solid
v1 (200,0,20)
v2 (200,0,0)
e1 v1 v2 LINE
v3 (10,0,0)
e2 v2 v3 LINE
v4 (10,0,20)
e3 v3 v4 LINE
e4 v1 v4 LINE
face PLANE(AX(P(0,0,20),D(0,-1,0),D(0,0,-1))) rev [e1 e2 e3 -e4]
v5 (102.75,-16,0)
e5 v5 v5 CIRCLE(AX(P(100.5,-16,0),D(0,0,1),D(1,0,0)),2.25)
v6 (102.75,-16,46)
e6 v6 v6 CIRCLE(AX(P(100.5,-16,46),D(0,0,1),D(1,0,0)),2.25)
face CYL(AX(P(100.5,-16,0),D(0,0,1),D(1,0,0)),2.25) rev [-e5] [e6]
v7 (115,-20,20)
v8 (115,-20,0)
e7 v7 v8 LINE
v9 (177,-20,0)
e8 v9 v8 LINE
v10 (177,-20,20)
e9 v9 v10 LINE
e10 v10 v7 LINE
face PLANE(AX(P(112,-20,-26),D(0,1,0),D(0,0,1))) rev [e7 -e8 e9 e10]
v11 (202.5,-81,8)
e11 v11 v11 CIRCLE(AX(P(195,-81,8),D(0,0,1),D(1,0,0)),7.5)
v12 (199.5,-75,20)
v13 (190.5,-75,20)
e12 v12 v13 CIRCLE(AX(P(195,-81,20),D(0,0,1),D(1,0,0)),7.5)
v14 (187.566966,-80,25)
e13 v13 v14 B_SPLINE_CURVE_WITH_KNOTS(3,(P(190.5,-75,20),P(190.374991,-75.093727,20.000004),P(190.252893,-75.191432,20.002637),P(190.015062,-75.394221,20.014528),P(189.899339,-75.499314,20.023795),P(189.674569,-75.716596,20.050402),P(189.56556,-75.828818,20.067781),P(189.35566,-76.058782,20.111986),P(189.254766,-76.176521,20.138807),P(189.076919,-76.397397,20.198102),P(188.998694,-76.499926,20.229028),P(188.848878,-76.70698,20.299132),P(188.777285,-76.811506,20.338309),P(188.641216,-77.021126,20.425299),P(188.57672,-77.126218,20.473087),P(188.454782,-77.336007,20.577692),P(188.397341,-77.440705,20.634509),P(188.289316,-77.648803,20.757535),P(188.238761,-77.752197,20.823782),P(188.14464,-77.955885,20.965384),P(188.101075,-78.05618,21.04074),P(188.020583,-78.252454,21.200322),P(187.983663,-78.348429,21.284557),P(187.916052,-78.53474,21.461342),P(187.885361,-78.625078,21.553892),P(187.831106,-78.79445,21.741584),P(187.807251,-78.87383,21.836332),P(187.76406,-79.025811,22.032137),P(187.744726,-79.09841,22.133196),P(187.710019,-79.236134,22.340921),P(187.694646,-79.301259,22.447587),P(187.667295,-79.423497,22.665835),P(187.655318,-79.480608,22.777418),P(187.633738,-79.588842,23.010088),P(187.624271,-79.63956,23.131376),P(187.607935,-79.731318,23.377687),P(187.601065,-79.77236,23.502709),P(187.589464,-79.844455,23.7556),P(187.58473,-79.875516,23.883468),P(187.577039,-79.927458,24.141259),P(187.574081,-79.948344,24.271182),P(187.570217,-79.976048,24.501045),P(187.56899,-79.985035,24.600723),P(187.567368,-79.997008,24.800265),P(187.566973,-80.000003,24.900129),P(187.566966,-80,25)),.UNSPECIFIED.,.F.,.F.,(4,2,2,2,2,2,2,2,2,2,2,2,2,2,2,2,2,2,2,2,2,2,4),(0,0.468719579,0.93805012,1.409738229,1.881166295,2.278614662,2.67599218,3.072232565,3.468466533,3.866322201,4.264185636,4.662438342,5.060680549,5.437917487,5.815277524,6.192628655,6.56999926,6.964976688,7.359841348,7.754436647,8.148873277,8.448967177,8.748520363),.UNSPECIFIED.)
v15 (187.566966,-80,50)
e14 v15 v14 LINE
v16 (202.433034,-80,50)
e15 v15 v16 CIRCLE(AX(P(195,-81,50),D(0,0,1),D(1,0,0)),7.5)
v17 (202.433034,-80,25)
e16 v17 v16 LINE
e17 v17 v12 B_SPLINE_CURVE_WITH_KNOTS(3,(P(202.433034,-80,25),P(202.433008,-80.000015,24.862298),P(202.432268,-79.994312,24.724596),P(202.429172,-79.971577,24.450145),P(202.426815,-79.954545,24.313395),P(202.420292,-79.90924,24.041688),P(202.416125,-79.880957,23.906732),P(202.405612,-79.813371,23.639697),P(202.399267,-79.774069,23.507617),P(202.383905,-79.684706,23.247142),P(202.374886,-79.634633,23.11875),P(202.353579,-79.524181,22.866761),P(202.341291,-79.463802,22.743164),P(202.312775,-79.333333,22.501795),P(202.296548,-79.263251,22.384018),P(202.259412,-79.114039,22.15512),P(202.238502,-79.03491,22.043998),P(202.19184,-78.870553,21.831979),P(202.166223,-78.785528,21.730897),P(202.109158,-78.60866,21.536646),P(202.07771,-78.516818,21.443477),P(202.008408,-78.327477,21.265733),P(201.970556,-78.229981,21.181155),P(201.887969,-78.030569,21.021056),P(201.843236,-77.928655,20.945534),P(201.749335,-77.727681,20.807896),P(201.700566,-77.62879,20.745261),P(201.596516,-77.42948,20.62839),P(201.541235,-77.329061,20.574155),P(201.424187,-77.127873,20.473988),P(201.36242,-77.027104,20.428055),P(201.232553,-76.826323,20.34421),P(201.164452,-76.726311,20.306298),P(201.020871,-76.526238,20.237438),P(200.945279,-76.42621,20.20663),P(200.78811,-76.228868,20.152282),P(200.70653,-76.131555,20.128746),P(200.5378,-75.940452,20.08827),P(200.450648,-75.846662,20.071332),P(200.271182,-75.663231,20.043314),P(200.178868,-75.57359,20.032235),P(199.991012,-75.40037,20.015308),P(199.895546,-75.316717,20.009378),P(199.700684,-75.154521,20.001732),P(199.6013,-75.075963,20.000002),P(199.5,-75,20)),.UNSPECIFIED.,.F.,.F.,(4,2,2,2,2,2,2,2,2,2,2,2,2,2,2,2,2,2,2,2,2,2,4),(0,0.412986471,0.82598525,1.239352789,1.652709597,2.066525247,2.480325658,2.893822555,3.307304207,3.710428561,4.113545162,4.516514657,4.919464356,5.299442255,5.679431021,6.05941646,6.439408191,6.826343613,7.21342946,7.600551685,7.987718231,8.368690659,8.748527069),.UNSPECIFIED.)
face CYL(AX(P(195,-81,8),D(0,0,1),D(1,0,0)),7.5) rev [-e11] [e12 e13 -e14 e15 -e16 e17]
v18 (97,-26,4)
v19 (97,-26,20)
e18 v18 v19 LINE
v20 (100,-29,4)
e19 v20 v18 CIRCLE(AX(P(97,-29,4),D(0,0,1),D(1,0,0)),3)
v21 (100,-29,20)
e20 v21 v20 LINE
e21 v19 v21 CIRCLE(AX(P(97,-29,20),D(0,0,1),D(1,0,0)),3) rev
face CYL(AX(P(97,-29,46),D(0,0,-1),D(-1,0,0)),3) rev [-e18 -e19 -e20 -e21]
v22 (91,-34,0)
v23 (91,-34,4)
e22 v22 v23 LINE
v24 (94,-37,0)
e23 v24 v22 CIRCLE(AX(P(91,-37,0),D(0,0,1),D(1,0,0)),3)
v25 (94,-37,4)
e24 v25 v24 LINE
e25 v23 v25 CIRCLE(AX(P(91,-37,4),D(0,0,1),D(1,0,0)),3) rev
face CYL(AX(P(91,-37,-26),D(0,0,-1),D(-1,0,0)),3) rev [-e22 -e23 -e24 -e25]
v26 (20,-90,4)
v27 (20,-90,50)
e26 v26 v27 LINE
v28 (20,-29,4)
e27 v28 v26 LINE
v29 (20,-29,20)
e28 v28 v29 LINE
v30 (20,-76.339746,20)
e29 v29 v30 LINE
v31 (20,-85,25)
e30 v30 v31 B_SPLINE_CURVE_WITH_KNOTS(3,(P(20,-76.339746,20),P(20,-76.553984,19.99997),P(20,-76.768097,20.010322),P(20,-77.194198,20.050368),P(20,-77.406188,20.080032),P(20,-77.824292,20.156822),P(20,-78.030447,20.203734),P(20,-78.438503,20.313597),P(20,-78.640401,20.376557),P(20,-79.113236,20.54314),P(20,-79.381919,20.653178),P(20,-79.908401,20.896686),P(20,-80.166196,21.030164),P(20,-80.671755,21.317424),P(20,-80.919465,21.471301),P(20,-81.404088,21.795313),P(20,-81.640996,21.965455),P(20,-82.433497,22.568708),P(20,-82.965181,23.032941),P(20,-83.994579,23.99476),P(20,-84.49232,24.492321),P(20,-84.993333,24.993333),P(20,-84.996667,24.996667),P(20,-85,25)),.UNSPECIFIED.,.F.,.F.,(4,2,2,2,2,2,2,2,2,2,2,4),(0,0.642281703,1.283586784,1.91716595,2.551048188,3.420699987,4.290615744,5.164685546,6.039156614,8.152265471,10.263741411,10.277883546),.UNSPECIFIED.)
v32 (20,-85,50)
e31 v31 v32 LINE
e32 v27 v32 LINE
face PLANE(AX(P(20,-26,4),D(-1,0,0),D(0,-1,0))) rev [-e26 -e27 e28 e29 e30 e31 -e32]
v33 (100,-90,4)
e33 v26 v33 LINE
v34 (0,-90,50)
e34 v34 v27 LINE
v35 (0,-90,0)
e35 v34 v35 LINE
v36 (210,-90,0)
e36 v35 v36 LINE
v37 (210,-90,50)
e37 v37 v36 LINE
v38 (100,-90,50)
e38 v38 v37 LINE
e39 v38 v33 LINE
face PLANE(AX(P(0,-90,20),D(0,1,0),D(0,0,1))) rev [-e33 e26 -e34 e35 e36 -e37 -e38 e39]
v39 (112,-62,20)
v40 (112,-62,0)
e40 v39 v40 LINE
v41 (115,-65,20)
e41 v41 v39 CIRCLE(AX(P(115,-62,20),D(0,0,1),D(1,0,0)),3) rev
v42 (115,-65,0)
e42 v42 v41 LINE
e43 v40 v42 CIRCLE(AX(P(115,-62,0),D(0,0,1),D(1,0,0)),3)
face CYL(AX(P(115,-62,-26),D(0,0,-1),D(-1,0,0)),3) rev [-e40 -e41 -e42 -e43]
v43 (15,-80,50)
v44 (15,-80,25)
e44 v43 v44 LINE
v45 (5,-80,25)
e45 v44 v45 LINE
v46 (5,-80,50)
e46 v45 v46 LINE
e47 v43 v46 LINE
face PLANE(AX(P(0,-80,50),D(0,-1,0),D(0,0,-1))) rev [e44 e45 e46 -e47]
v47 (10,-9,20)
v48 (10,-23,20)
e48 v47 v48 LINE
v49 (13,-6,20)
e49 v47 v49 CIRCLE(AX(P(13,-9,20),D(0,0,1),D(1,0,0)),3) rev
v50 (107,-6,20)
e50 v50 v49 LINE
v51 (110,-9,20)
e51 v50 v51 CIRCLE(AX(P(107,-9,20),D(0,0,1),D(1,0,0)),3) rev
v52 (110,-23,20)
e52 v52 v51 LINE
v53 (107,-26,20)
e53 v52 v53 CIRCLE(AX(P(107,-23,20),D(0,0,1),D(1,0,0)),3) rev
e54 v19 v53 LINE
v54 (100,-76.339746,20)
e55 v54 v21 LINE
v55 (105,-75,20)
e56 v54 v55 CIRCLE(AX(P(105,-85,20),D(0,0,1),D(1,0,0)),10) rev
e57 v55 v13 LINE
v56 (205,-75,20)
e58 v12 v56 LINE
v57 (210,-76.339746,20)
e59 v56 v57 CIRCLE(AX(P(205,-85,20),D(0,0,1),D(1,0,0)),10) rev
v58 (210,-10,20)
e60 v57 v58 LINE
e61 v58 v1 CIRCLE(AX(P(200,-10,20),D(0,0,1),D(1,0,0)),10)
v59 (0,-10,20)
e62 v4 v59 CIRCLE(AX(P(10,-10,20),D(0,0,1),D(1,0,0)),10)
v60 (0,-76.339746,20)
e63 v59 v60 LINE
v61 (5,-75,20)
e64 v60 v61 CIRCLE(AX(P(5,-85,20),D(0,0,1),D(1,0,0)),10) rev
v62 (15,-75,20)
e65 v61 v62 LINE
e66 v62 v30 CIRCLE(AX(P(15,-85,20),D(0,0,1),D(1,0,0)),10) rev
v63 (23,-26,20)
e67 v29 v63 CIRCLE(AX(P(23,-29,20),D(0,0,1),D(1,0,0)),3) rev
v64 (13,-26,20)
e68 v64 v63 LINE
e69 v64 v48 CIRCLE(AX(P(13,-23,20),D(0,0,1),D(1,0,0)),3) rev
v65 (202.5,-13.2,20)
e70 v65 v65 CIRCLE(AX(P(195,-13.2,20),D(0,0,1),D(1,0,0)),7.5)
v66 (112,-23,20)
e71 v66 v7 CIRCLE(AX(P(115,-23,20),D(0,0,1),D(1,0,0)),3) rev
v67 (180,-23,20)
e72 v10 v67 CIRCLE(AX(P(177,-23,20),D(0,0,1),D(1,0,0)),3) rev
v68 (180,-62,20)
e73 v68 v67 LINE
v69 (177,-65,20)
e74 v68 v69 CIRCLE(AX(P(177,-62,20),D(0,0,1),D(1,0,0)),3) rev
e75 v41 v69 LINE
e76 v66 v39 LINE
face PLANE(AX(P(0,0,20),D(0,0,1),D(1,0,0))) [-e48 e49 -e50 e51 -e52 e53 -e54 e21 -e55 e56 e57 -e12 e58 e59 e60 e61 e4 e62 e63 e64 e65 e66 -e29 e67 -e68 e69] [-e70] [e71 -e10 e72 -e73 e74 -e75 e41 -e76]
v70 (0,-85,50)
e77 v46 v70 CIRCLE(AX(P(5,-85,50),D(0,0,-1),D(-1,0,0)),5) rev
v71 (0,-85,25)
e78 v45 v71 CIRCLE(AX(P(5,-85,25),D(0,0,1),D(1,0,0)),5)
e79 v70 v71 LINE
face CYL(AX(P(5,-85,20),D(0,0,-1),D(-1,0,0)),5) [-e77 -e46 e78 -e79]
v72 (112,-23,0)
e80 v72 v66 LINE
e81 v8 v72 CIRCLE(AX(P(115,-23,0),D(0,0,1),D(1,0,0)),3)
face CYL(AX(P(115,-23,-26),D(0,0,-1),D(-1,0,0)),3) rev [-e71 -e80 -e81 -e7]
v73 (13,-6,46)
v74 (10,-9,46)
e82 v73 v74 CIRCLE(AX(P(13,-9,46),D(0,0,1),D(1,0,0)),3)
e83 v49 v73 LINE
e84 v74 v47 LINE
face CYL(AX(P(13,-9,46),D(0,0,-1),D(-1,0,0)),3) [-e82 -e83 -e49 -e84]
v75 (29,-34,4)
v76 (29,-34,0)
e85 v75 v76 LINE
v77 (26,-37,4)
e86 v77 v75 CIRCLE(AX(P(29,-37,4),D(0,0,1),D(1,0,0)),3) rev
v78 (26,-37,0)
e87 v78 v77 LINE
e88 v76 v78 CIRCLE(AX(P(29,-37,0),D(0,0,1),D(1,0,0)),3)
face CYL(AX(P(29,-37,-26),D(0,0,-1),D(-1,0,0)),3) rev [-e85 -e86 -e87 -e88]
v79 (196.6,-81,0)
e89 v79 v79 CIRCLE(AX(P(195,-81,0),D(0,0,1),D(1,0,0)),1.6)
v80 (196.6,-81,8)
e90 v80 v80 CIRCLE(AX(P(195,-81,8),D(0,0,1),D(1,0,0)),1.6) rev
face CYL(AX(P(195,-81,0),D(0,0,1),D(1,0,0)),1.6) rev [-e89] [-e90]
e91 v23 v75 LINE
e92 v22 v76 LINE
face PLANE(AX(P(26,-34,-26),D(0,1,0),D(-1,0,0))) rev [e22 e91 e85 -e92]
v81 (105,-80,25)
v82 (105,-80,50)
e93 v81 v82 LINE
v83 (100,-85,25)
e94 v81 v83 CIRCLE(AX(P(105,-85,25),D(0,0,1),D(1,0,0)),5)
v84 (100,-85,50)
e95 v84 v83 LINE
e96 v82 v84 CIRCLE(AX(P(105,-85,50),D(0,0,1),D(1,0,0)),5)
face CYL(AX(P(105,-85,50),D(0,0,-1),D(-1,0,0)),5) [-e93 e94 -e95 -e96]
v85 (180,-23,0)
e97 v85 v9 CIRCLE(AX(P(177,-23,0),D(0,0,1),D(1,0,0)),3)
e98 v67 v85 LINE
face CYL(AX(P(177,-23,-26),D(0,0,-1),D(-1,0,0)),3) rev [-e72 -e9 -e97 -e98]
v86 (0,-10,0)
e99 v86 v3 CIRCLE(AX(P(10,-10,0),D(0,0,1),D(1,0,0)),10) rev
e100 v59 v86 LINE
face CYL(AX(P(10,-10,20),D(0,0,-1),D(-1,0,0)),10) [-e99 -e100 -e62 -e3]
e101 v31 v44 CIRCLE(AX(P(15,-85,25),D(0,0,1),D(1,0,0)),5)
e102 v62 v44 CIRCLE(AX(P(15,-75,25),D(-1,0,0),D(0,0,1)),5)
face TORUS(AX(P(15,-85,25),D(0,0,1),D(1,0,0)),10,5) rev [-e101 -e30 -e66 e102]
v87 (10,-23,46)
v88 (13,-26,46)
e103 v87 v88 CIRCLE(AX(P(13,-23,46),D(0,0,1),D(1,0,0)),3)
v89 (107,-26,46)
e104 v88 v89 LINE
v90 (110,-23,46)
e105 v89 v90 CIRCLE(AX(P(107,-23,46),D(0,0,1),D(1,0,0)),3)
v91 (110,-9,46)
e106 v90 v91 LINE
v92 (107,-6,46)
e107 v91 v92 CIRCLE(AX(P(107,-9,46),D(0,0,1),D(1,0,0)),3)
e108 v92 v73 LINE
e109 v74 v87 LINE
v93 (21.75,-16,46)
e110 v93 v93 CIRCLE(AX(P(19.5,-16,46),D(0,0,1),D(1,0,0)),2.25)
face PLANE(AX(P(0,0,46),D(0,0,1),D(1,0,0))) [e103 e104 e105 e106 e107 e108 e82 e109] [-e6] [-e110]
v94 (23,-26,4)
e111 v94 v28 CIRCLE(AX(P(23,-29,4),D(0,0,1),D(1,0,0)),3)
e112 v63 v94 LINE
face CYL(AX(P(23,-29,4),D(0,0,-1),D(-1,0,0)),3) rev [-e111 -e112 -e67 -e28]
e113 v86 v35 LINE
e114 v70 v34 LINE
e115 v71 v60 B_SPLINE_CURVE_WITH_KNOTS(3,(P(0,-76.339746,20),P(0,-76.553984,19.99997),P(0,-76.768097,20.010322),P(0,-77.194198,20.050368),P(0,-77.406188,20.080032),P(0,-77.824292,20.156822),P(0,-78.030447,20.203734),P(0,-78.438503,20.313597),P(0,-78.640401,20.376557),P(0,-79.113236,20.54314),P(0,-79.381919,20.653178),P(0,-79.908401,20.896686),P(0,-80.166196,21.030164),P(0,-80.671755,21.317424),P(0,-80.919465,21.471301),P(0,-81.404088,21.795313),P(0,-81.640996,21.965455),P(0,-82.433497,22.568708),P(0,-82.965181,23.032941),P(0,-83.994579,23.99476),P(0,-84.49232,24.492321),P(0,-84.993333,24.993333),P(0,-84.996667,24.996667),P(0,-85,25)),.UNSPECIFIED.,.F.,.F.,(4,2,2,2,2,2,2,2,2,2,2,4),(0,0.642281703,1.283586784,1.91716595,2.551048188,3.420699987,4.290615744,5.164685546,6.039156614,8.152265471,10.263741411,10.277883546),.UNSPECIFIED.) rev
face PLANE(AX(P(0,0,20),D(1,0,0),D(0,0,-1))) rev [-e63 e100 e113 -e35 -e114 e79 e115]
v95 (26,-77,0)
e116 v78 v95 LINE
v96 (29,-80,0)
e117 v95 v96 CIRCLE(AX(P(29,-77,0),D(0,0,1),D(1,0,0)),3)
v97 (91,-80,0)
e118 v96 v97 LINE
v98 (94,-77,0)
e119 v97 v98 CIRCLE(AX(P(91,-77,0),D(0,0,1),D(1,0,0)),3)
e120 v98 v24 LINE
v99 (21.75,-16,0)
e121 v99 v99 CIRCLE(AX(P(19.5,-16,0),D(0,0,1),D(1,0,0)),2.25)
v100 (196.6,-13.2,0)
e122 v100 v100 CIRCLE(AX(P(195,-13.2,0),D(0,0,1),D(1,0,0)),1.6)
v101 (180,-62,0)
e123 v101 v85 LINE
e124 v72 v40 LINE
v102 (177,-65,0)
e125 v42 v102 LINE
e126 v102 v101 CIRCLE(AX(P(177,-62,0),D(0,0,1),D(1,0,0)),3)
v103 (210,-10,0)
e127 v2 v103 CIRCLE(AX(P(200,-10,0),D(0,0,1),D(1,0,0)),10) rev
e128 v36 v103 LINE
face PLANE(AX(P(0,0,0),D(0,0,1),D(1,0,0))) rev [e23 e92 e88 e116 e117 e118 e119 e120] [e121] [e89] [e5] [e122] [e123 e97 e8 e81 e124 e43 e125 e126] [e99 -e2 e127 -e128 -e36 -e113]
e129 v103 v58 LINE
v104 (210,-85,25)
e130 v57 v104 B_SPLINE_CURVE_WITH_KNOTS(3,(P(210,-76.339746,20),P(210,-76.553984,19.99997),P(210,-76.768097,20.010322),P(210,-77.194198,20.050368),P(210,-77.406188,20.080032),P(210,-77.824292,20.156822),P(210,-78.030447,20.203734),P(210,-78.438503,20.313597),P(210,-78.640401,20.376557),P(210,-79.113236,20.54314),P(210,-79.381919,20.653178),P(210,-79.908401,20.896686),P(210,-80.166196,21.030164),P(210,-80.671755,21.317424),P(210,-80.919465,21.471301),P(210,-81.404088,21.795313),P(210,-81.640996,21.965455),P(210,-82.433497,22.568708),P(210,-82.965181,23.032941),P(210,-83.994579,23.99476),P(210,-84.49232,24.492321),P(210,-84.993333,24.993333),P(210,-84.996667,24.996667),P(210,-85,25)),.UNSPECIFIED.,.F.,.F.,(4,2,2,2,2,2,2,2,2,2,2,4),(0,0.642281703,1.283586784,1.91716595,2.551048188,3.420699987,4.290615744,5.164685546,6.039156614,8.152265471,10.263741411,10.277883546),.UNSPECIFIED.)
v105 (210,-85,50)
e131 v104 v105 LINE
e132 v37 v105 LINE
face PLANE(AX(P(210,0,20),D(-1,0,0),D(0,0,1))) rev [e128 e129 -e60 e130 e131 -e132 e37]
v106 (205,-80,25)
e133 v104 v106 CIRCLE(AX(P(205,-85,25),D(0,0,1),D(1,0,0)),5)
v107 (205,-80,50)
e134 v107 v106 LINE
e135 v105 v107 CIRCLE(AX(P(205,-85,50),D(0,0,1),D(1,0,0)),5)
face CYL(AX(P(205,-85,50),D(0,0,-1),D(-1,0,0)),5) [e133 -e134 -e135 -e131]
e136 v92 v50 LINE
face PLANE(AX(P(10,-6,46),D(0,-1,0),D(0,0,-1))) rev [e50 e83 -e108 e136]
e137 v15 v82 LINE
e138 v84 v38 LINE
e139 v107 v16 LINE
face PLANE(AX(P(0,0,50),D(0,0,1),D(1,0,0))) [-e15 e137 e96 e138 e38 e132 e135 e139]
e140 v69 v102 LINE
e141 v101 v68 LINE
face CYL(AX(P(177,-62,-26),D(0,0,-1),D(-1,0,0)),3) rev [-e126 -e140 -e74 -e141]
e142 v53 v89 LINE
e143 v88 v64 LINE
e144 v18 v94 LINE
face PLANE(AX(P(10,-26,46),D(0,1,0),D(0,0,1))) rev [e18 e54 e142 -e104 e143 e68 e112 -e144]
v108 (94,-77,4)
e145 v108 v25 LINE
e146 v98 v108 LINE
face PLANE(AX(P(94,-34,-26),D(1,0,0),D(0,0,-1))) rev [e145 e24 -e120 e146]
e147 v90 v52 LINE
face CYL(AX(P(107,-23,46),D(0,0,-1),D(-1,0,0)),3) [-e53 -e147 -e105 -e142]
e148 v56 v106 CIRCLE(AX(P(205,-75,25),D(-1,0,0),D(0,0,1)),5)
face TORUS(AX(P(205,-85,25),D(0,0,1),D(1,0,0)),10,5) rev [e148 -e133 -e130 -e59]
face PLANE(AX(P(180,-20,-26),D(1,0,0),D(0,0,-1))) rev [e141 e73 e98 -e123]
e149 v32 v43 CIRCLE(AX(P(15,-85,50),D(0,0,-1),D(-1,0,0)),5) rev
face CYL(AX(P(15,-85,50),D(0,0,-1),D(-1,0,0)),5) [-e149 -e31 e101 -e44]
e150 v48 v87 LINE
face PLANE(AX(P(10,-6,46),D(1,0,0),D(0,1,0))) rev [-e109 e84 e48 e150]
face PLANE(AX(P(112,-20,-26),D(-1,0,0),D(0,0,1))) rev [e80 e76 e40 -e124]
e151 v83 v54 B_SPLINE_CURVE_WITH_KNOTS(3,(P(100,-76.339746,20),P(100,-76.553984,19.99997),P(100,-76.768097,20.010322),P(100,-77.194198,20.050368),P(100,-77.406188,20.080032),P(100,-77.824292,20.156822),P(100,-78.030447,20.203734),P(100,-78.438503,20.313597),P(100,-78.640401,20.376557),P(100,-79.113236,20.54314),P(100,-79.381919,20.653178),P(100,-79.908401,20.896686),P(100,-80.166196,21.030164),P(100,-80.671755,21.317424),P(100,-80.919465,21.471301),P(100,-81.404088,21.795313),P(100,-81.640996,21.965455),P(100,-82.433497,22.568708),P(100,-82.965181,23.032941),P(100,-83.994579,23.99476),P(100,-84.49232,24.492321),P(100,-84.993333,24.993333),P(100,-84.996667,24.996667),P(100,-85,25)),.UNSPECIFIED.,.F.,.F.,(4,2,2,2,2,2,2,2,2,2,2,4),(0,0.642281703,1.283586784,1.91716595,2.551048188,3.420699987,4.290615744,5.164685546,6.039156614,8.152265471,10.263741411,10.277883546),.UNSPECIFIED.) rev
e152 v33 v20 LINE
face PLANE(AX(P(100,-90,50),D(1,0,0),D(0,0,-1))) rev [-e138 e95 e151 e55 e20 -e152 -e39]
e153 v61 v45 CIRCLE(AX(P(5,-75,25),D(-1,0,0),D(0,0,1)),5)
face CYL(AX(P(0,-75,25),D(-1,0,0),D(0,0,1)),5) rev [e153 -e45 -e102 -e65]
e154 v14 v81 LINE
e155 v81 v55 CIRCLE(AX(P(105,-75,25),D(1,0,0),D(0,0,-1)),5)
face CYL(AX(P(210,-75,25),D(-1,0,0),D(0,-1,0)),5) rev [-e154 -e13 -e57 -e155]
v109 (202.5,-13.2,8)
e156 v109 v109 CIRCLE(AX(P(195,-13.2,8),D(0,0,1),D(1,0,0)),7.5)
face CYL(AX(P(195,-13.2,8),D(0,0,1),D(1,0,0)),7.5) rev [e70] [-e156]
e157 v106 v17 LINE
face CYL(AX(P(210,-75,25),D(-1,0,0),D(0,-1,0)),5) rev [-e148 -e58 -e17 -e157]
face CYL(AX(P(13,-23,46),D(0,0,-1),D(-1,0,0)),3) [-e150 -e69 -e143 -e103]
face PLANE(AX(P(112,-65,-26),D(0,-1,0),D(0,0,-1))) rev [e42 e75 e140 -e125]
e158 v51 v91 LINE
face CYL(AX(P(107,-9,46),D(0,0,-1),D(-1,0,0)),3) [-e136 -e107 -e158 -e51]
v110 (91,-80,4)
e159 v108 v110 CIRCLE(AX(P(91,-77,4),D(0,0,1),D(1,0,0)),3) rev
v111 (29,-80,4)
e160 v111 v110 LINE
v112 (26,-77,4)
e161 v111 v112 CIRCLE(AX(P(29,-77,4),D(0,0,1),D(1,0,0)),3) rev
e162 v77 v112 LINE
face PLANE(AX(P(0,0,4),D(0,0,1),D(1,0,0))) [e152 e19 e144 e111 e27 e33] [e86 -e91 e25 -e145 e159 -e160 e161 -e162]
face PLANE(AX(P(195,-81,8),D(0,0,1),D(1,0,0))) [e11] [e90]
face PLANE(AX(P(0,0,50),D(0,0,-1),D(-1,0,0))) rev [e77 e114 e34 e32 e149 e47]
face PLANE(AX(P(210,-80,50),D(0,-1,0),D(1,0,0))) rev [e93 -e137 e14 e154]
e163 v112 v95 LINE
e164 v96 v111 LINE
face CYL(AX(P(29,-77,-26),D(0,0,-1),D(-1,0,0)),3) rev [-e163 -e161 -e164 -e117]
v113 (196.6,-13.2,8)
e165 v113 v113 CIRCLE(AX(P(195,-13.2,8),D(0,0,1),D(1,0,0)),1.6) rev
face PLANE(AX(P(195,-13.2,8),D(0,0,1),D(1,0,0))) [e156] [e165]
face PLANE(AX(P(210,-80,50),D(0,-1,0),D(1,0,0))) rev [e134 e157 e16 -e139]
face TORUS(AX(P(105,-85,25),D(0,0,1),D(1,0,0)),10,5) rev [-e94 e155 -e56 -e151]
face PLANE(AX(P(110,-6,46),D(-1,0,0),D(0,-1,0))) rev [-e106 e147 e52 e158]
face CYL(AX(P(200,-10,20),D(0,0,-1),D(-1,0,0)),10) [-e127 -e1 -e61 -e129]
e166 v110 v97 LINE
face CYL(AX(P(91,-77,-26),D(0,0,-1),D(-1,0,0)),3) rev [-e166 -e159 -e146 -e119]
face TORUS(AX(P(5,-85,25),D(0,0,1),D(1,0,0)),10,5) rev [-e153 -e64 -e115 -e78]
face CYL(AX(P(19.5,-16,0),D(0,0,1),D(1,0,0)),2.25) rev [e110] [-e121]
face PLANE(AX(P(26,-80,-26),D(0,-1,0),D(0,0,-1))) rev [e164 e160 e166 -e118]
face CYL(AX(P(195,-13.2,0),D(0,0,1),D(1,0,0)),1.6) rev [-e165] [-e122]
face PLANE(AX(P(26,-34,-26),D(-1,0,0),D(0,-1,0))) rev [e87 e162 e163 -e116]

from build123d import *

# Parameters (mm, degrees)
SKETCH1_W           = 210
SKETCH1_H           = 90
BOSS_EXTRUDE1_DEPTH = 20
SKETCH2_R           = 1.6
CUT_EXTRUDE1_DEPTH  = 20
SKETCH3_W           = 110
SKETCH3_H           = 10
BOSS_EXTRUDE2_DEPTH = 30
SKETCH4_W           = 100
SKETCH4_H           = 20
BOSS_EXTRUDE3_DEPTH = 26
SKETCH5_R           = 2.25
CUT_EXTRUDE2_DEPTH  = 234.057932712
SKETCH7_W           = 80
SKETCH7_H           = 64
CUT_EXTRUDE3_DEPTH  = 16
SKETCH8_R           = 7.5
CUT_EXTRUDE4_DEPTH  = 12
SKETCH9_R           = 7.5
CUT_EXTRUDE5_DEPTH  = 42
SKETCH10_W          = 68
SKETCH10_H          = 45
CUT_EXTRUDE6_DEPTH  = 46
SKETCH11_W          = 20
SKETCH11_H          = 10
BOSS_EXTRUDE5_DEPTH = 30
FILLET1_R           = 10
SKETCH12_W          = 68
SKETCH12_H          = 46
CUT_EXTRUDE7_DEPTH  = 30
FILLET2_R           = 5
FILLET3_R           = 5
FILLET4_R           = 3
FILLET5_R           = 3


with BuildPart() as part:
    # Sketch1 → Boss-Extrude1 (new body)
    with BuildSketch(Plane.XY):
        with Locations((105, -45)):
            Rectangle(SKETCH1_W, SKETCH1_H)
    extrude(amount=BOSS_EXTRUDE1_DEPTH)

    # Sketch2 → Cut-Extrude1 (cut)
    with BuildSketch(Plane.XY.offset(20)):
        with Locations((195, -13.2)):
            Circle(SKETCH2_R)
        with Locations((195, -81)):
            Circle(SKETCH2_R)
    extrude(amount=-CUT_EXTRUDE1_DEPTH, mode=Mode.SUBTRACT)

    # Sketch3 → Boss-Extrude2 (add)
    with BuildSketch(Plane.XY.offset(20)):
        with Locations((155, -85)):
            Rectangle(SKETCH3_W, SKETCH3_H)
    extrude(amount=BOSS_EXTRUDE2_DEPTH)

    # Sketch4 → Boss-Extrude3 (add)
    with BuildSketch(Plane.XY.offset(20)):
        with Locations((60, -16)):
            Rectangle(SKETCH4_W, SKETCH4_H)
    extrude(amount=BOSS_EXTRUDE3_DEPTH)

    # Sketch5 → Cut-Extrude2 (cut, through all)
    with BuildSketch(Plane.XY.offset(46)):
        with Locations((100.5, -16)):
            Circle(SKETCH5_R)
        with Locations((19.5, -16)):
            Circle(SKETCH5_R)
    extrude(amount=-CUT_EXTRUDE2_DEPTH, mode=Mode.SUBTRACT)

    # Sketch7 → Cut-Extrude3 (cut)
    with BuildSketch(Plane.XY.offset(20)):
        with Locations((60, -58)):
            Rectangle(SKETCH7_W, SKETCH7_H)
    extrude(amount=-CUT_EXTRUDE3_DEPTH, mode=Mode.SUBTRACT)

    # Sketch8 → Cut-Extrude4 (cut)
    with BuildSketch(Plane.XY.offset(20)):
        with Locations((195, -13.2)):
            Circle(SKETCH8_R)
    extrude(amount=-CUT_EXTRUDE4_DEPTH, mode=Mode.SUBTRACT)

    # Sketch9 → Cut-Extrude5 (cut)
    with BuildSketch(Plane.XY.offset(50)):
        with Locations((195, -81)):
            Circle(SKETCH9_R)
    extrude(amount=-CUT_EXTRUDE5_DEPTH, mode=Mode.SUBTRACT)

    # Sketch10 → Cut-Extrude6 (cut)
    with BuildSketch(Plane.XY.offset(20)):
        with Locations((146, -42.5)):
            Rectangle(SKETCH10_W, SKETCH10_H)
    extrude(amount=-CUT_EXTRUDE6_DEPTH, mode=Mode.SUBTRACT)

    # Sketch11 → Boss-Extrude5 (add)
    with BuildSketch(Plane.XY.offset(20)):
        with Locations((10, -85)):
            Rectangle(SKETCH11_W, SKETCH11_H)
    extrude(amount=BOSS_EXTRUDE5_DEPTH)

    # Fillet1
    fillet1_edges = [part.edges().sort_by_distance(p)[0] for p in [
        (0, 0, 10),
        (210, 0, 10),
    ]]
    fillet(fillet1_edges, radius=FILLET1_R)

    # Sketch12 → Cut-Extrude7 (cut)
    with BuildSketch(Plane.XY.offset(4)):
        with Locations((60, -57)):
            Rectangle(SKETCH12_W, SKETCH12_H)
    extrude(amount=-CUT_EXTRUDE7_DEPTH, mode=Mode.SUBTRACT)

    # Fillet2
    fillet2_edges = [part.edges().sort_by_distance(p)[0] for p in [
        (0, -80, 35),
        (20, -80, 35),
        (210, -80, 35),
        (100, -80, 35),
    ]]
    fillet(fillet2_edges, radius=FILLET2_R)

    # Fillet3
    # the kernel refuses this fillet: 5 mm, written as the material it adds along each edge
    with BuildSketch(Plane(origin=(189.933034374, -80, 20), x_dir=(0, 1, 0), z_dir=(1, 0, 0))) as fillet3_piece_1_section:
        with BuildLine():
            CenterArc((FILLET3_R, FILLET3_R), FILLET3_R, 180, 90)
            Line((0, FILLET3_R), (0, 0))
            Line((0, 0), (FILLET3_R, 0))
        make_face()
    fillet3_piece_1 = extrude(amount=15.066965626, mode=Mode.PRIVATE)
    fillet3_piece_1 = fillet3_piece_1 - Plane(origin=(195, -81, 20.004383527), x_dir=(1, 0, 0), z_dir=(0, 0, 1)) * Cylinder(7.5, 51, mode=Mode.PRIVATE)
    add(fillet3_piece_1)
    with BuildSketch(Plane(origin=(15, -80, 20), x_dir=(0, 1, 0), z_dir=(-1, 0, 0))) as fillet3_piece_2:
        with BuildLine():
            CenterArc((FILLET3_R, -FILLET3_R), FILLET3_R, 90, 90)
            Line((0, -FILLET3_R), (0, 0))
            Line((0, 0), (FILLET3_R, 0))
        make_face()
    extrude(amount=10)
    with BuildSketch(Plane(origin=(205, -85, 20), x_dir=(-0.801744239297649, -0.5976672776328267, 0), z_dir=(-0.5976672776328267, 0.801744239297649, 0))) as fillet3_piece_3_section:
        with BuildLine():
            CenterArc((5 + FILLET3_R, FILLET3_R), FILLET3_R, 180, 90)
            Line((5, FILLET3_R), (5, 0))
            Line((5, 0), (5 + FILLET3_R, 0))
        make_face()
    fillet3_piece_3 = revolve(axis=Axis((205, -85, 20), (0, 0, 1)), revolution_arc=233.296989237, mode=Mode.PRIVATE)
    fillet3_piece_3 = split(fillet3_piece_3, bisect_by=Plane(origin=(208.749694825, -90, 21.558141558), z_dir=(0, 1, 0)), keep=Keep.TOP, mode=Mode.PRIVATE)
    fillet3_piece_3 = split(fillet3_piece_3, bisect_by=Plane(origin=(210, -81.250305307, 21.558141558), z_dir=(-1, 0, 0)), keep=Keep.TOP, mode=Mode.PRIVATE)
    add(fillet3_piece_3)
    with BuildSketch(Plane(origin=(105, -85, 20), x_dir=(0, 1, 0), z_dir=(1, 0, 0))) as fillet3_piece_4_section:
        with BuildLine():
            CenterArc((5 + FILLET3_R, FILLET3_R), FILLET3_R, 180, 90)
            Line((5, FILLET3_R), (5, 0))
            Line((5, 0), (5 + FILLET3_R, 0))
        make_face()
    fillet3_piece_4 = revolve(axis=Axis((105, -85, 20), (0, 0, 1)), revolution_arc=233.296989237, mode=Mode.PRIVATE)
    fillet3_piece_4 = split(fillet3_piece_4, bisect_by=Plane(origin=(103.049091377, -90, 20.836500951), z_dir=(0, 1, 0)), keep=Keep.TOP, mode=Mode.PRIVATE)
    fillet3_piece_4 = split(fillet3_piece_4, bisect_by=Plane(origin=(100, -78.901123736, 20.836500951), z_dir=(1, 0, 0)), keep=Keep.TOP, mode=Mode.PRIVATE)
    add(fillet3_piece_4)
    with BuildSketch(Plane(origin=(15, -85, 20), x_dir=(0, 1, 0), z_dir=(-1, 0, 0))) as fillet3_piece_5_section:
        with BuildLine():
            CenterArc((5 + FILLET3_R, -FILLET3_R), FILLET3_R, 90, 90)
            Line((5, -FILLET3_R), (5, 0))
            Line((5, 0), (5 + FILLET3_R, 0))
        make_face()
    fillet3_piece_5 = revolve(axis=Axis((15, -85, 20), (0, 0, -1)), revolution_arc=233.296989237, mode=Mode.PRIVATE)
    fillet3_piece_5 = split(fillet3_piece_5, bisect_by=Plane(origin=(16.950908623, -90, 20.836500951), z_dir=(0, 1, 0)), keep=Keep.TOP, mode=Mode.PRIVATE)
    fillet3_piece_5 = split(fillet3_piece_5, bisect_by=Plane(origin=(20, -78.901123736, 20.836500951), z_dir=(-1, 0, 0)), keep=Keep.TOP, mode=Mode.PRIVATE)
    add(fillet3_piece_5)
    with BuildSketch(Plane(origin=(5, -85, 20), x_dir=(0.8017442392976476, -0.5976672776328283, 0), z_dir=(0.5976672776328283, 0.8017442392976476, 0))) as fillet3_piece_6_section:
        with BuildLine():
            CenterArc((5 + FILLET3_R, -FILLET3_R), FILLET3_R, 90, 90)
            Line((5, -FILLET3_R), (5, 0))
            Line((5, 0), (5 + FILLET3_R, 0))
        make_face()
    fillet3_piece_6 = revolve(axis=Axis((5, -85, 20), (0, 0, -1)), revolution_arc=233.296989237, mode=Mode.PRIVATE)
    fillet3_piece_6 = split(fillet3_piece_6, bisect_by=Plane(origin=(1.250305308, -90, 21.55814164), z_dir=(0, 1, 0)), keep=Keep.TOP, mode=Mode.PRIVATE)
    fillet3_piece_6 = split(fillet3_piece_6, bisect_by=Plane(origin=(0, -81.250305308, 21.55814164), z_dir=(1, 0, 0)), keep=Keep.TOP, mode=Mode.PRIVATE)
    add(fillet3_piece_6)
    with BuildSketch(Plane(origin=(105, -80, 20), x_dir=(0, 1, 0), z_dir=(1, 0, 0))) as fillet3_piece_7_section:
        with BuildLine():
            CenterArc((FILLET3_R, FILLET3_R), FILLET3_R, 180, 90)
            Line((0, FILLET3_R), (0, 0))
            Line((0, 0), (FILLET3_R, 0))
        make_face()
    fillet3_piece_7 = extrude(amount=95.066965626, mode=Mode.PRIVATE)
    fillet3_piece_7 = fillet3_piece_7 - Plane(origin=(195, -81, 21.114667371), x_dir=(1, 0, 0), z_dir=(0, 0, 1)) * Cylinder(7.5, 211, mode=Mode.PRIVATE)
    add(fillet3_piece_7)

    # Fillet4
    fillet4_edges = [part.edges().sort_by_distance(p)[0] for p in [
        (180, -20, 10),
        (180, -65, 10),
        (26, -80, 2),
        (26, -34, 2),
        (94, -34, 2),
        (94, -80, 2),
        (20, -26, 12),
        (100, -26, 12),
        (112, -65, 10),
        (112, -20, 10),
    ]]
    fillet(fillet4_edges, radius=FILLET4_R)

    # Fillet5
    fillet5_edges = [part.edges().sort_by_distance(p)[0] for p in [
        (10, -6, 33),
        (10, -26, 33),
        (110, -26, 33),
        (110, -6, 33),
    ]]
    fillet(fillet5_edges, radius=FILLET5_R)


solid = part.part
